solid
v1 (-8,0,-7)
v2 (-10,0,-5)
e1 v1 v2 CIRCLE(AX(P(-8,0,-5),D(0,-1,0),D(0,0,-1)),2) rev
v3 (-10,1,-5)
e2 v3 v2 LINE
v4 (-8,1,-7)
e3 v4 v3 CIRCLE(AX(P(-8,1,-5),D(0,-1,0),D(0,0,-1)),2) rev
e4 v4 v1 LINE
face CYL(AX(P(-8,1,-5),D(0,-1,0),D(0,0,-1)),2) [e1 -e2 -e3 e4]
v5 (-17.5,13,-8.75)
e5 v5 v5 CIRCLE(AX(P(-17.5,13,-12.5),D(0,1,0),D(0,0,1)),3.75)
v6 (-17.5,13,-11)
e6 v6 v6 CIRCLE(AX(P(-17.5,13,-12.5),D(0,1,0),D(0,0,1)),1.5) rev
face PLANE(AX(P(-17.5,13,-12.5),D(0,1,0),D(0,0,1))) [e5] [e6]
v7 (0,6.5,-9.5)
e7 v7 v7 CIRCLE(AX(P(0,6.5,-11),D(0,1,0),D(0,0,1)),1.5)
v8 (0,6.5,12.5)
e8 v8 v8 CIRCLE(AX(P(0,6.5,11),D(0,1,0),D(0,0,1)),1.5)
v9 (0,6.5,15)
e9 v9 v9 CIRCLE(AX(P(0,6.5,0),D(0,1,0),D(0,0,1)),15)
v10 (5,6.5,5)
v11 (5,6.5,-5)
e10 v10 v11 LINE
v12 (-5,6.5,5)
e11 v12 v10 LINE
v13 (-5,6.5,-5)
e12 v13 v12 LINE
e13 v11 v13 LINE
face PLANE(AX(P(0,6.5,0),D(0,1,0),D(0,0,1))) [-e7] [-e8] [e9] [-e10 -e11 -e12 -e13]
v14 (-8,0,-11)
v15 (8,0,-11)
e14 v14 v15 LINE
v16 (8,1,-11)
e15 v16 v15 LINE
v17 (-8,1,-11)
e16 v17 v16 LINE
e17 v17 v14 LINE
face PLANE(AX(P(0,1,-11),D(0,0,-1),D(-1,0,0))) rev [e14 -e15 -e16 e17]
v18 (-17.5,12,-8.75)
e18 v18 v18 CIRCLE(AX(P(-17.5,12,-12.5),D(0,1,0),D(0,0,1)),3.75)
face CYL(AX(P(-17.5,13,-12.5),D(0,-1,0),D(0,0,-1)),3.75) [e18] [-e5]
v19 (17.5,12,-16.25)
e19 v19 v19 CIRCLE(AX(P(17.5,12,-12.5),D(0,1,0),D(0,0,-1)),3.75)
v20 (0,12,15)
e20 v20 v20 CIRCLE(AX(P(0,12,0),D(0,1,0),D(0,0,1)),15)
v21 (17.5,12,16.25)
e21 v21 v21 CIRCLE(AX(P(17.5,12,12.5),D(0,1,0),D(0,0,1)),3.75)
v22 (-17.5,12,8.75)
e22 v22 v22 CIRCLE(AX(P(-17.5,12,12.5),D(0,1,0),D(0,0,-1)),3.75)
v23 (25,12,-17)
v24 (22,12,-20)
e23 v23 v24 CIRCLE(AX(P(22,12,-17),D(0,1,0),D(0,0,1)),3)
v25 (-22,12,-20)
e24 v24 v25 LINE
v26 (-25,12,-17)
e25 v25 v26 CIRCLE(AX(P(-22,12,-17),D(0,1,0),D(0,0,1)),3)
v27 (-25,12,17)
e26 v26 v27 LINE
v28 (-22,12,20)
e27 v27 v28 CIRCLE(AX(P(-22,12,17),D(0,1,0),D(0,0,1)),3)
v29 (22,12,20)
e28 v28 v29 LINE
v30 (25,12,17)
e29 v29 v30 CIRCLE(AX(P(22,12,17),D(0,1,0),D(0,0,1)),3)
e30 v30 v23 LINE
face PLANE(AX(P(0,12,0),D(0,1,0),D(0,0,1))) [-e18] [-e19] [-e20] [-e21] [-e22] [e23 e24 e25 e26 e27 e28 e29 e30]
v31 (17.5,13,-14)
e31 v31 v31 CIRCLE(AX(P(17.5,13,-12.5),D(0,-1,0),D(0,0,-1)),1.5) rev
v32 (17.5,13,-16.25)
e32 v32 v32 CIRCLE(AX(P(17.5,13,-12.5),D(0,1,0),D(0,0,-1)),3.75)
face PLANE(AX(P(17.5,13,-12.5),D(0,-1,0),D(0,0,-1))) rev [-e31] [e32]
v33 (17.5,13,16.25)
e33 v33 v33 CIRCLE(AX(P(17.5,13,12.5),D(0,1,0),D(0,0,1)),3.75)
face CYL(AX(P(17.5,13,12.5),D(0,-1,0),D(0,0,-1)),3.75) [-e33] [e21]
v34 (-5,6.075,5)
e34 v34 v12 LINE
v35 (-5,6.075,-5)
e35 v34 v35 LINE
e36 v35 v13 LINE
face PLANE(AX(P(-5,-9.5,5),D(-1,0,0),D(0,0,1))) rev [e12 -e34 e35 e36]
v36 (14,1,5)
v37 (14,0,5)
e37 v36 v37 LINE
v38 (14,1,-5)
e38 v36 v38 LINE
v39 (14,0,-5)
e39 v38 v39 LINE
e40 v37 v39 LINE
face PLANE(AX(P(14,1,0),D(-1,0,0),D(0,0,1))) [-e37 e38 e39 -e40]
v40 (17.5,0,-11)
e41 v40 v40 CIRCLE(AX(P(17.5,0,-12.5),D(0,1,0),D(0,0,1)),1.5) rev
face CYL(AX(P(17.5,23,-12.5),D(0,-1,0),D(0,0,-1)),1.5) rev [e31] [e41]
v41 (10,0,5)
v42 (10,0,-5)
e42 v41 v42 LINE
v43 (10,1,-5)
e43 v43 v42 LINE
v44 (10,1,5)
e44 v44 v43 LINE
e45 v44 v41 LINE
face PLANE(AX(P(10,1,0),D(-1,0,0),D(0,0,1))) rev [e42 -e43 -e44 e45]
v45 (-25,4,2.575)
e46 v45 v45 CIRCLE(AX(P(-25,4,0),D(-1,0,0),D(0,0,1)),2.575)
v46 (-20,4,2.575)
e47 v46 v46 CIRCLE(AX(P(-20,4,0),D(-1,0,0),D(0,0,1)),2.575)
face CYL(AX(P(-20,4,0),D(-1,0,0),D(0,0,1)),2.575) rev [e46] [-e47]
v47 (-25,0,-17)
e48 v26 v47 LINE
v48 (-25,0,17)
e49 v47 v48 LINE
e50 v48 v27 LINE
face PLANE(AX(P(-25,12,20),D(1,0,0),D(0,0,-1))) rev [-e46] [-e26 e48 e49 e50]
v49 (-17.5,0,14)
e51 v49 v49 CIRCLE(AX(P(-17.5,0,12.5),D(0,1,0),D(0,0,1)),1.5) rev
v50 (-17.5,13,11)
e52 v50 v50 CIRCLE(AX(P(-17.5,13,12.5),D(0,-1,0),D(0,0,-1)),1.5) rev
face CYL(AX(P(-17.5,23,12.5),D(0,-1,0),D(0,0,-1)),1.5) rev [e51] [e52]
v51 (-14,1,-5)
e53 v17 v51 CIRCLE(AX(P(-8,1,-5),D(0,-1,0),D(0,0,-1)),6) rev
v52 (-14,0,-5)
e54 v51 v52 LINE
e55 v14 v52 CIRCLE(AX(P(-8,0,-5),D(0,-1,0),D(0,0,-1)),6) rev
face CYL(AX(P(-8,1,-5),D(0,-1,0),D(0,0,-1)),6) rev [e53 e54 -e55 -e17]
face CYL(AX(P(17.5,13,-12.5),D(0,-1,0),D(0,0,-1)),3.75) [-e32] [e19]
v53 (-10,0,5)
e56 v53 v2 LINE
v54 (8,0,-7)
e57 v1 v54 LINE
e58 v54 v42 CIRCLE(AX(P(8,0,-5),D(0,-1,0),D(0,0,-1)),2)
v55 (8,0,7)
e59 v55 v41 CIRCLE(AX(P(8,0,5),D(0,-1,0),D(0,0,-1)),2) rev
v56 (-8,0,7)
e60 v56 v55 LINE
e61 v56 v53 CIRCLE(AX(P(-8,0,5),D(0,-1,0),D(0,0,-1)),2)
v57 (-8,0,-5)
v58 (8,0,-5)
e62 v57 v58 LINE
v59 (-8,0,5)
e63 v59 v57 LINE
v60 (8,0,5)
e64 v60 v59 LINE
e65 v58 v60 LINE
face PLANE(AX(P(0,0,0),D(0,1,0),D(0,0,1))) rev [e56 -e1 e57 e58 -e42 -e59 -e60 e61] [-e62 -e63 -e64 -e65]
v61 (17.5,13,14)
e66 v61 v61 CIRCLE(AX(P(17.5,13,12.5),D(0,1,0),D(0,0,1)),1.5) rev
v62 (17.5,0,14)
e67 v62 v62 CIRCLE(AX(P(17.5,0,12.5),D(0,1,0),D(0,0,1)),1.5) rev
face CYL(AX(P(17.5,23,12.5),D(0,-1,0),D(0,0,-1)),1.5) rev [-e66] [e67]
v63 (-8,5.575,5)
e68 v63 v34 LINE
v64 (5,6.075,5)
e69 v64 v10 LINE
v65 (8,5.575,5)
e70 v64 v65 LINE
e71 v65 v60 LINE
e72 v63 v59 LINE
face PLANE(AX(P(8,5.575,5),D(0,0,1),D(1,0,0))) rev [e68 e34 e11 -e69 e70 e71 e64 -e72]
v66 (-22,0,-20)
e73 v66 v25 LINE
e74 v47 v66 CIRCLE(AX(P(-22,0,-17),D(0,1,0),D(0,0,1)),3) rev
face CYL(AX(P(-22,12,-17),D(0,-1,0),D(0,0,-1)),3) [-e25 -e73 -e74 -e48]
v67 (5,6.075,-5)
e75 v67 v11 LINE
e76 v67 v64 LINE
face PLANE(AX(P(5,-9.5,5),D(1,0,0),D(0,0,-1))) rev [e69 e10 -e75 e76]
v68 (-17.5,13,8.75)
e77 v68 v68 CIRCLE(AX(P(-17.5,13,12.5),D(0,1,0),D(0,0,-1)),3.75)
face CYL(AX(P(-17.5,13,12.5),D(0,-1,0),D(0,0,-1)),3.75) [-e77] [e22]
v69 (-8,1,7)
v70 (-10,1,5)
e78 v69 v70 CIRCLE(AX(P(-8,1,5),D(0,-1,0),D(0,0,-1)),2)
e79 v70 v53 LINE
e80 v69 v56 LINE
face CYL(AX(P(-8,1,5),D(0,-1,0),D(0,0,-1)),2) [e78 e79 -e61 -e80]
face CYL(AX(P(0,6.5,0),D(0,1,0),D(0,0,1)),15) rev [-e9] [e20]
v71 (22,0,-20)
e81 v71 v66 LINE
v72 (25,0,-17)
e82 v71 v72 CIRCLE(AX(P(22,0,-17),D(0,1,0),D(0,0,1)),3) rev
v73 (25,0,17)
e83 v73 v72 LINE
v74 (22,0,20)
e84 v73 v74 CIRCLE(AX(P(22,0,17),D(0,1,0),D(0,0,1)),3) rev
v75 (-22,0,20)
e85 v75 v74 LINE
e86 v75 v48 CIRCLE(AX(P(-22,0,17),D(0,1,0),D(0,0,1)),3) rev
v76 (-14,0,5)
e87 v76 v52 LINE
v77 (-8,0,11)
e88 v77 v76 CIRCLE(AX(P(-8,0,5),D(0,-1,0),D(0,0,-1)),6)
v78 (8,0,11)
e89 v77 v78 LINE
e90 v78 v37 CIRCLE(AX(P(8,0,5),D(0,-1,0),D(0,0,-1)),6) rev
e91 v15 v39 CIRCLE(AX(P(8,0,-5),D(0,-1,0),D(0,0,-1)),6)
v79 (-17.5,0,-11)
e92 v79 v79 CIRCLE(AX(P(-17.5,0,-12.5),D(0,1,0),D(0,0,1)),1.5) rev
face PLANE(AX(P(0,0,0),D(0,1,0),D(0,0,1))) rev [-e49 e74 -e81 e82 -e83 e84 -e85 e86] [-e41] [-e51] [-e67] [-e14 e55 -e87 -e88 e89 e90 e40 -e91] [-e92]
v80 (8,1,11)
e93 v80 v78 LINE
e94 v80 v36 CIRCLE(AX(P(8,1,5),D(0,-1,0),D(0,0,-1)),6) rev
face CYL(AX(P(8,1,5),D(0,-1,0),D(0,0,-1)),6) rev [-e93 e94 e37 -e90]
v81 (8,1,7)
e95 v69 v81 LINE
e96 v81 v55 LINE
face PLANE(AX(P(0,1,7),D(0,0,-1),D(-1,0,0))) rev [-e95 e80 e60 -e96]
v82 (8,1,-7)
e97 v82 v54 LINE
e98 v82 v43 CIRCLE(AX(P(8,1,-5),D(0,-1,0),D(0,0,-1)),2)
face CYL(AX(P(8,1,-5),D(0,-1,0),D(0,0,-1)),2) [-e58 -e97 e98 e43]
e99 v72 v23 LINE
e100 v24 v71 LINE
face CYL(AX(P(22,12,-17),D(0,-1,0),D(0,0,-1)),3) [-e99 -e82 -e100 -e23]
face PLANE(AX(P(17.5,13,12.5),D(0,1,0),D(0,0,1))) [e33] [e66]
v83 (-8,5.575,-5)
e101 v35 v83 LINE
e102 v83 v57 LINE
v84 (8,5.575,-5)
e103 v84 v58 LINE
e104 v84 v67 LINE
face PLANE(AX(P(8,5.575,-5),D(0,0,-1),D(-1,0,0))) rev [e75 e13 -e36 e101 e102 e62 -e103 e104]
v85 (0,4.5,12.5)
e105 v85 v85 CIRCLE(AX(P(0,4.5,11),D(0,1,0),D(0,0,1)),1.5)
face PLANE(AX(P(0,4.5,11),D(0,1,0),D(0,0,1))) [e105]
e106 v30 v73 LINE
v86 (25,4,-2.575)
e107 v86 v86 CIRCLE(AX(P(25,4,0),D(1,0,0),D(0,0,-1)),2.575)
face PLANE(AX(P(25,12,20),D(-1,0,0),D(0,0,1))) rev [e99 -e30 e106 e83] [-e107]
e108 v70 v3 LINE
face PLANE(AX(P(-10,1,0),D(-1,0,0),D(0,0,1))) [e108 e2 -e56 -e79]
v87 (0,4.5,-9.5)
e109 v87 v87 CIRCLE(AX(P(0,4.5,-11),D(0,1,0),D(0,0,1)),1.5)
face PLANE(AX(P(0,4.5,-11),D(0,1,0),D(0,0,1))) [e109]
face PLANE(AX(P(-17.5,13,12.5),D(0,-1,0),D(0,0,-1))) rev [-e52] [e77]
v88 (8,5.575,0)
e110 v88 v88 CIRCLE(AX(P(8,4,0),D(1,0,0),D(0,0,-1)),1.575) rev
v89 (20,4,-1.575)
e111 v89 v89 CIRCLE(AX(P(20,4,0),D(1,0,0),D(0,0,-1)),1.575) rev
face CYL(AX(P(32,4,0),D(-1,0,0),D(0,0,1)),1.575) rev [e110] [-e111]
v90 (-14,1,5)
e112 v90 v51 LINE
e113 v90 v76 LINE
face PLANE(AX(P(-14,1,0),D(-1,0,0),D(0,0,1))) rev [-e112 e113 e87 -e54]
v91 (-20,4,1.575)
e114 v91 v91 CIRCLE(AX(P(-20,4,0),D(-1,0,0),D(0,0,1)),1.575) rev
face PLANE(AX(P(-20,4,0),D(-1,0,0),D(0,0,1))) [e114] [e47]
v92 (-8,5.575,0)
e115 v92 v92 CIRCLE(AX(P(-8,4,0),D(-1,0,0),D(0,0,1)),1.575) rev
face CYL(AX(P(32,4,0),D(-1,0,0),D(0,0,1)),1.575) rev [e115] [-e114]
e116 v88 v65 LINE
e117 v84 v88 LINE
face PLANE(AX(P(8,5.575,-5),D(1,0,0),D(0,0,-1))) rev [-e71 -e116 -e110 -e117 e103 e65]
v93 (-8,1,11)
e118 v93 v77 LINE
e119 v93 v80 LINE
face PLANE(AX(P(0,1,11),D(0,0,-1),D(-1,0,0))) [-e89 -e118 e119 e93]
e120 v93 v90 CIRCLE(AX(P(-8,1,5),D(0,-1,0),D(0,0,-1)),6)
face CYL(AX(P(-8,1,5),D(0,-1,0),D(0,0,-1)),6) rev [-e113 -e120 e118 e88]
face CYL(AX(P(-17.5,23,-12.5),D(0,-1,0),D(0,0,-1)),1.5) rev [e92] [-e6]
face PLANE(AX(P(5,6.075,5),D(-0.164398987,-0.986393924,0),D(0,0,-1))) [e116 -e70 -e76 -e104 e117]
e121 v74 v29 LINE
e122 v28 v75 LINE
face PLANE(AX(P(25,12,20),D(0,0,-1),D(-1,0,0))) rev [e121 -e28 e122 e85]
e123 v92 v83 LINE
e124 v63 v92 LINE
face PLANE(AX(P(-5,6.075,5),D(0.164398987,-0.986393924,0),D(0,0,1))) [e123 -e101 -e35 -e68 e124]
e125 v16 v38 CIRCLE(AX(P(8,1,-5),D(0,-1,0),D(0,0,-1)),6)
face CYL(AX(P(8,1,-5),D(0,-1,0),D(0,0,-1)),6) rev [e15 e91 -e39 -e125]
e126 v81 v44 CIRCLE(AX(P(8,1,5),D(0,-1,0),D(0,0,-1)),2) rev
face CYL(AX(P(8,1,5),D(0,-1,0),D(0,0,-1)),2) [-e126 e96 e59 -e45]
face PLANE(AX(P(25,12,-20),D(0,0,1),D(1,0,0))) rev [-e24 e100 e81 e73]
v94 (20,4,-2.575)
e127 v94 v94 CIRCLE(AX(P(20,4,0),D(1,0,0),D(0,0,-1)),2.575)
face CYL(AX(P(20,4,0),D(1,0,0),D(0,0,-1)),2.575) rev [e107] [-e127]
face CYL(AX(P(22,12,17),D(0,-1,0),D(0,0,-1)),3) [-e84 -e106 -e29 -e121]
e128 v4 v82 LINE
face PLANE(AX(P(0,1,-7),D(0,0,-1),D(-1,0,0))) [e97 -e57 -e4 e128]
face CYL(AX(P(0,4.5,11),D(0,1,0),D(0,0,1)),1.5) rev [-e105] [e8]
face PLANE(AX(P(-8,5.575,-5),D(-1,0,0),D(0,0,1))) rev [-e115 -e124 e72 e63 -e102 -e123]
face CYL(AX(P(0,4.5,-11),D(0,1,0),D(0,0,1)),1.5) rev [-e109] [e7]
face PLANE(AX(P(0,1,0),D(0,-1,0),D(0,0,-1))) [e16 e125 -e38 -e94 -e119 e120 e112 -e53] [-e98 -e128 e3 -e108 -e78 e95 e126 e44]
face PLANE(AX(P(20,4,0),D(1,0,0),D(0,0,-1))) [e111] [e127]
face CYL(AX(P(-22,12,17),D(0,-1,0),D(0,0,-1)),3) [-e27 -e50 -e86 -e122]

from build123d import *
from OCP.BRepFilletAPI import BRepFilletAPI_MakeChamfer

# Parameters (mm, degrees)
SKETCH1_W           = 50
SKETCH1_H           = 40
BODY_DEPTH          = 12
FILLETBODY_R        = 3
SKETCH3_R           = 3.75
BOLT_EXTRUDE_DEPTH  = 1
BOLT_DEPTH          = 10
BOLT_DEPTH_BACK     = 16
SKETCH4_R           = 1.5
SKETCH41_R          = 1.575
CHANNEL1_DEPTH      = 57
SKETCH42_R          = 2.575
INLET_DEPTH         = 5
OUTLET_START        = -5
SKETCH43_R          = 2.575
OUTLET_DEPTH        = 5
SKETCH44_R          = 15
WINDOW_DEPTH        = 5.5
SKETCH45_W          = 16
SKETCH45_H          = 10
FLOWCH_DEPTH        = 5.575
SKETCH46_W          = 10
SKETCH46_H          = 10
WINDOW_HOLE_DEPTH   = 16
SKETCH49_R          = 1.5
FIXHOLES_DEPTH      = 2
GASKET_DEPTH        = 1
CHAMFER_FLOW_SIZE   = 0.5
CHAMFER_FLOW_SIZE_2 = 3


with BuildPart() as part:
    # Sketch1 → Body (new body)
    with BuildSketch(Plane(origin=(0, 0, 0), x_dir=(1, 0, 0), z_dir=(0, 1, 0))):
        Rectangle(SKETCH1_W, SKETCH1_H)
    extrude(amount=BODY_DEPTH)

    # FilletBody
    filletbody_edges = [part.edges().sort_by_distance(p)[0] for p in [
        (-25, 6, -20),
        (25, 6, -20),
        (25, 6, 20),
        (-25, 6, 20),
    ]]
    fillet(filletbody_edges, radius=FILLETBODY_R)

    # Sketch3 → Bolt extrude (add)
    with BuildSketch(Plane(origin=(0, 12, 0), x_dir=(1, 0, 0), z_dir=(0, 1, 0))):
        with Locations(Location((-17.5, 12.5, 0), (0, 0, 270))):
            Circle(SKETCH3_R)
        with Locations(Location((17.5, 12.5, 0), (0, 0, 90))):
            Circle(SKETCH3_R)
        with Locations(Location((17.5, -12.5, 0), (0, 0, 270))):
            Circle(SKETCH3_R)
        with Locations(Location((-17.5, -12.5, 0), (0, 0, 90))):
            Circle(SKETCH3_R)
    extrude(amount=BOLT_EXTRUDE_DEPTH)

    # Sketch4 → Bolt (cut, two sides: drawn at the far end of the back side and taken through both)
    with BuildSketch(Plane(origin=(0, 13, 0), x_dir=(1, 0, 0), z_dir=(0, 1, 0)).offset(-BOLT_DEPTH_BACK)):
        with Locations(Location((-17.5, 12.5, 0), (0, 0, 270))):
            Circle(SKETCH4_R)
        with Locations(Location((17.5, 12.5, 0), (0, 0, 90))):
            Circle(SKETCH4_R)
        with Locations(Location((17.5, -12.5, 0), (0, 0, 270))):
            Circle(SKETCH4_R)
        with Locations(Location((-17.5, -12.5, 0), (0, 0, 90))):
            Circle(SKETCH4_R)
    extrude(amount=BOLT_DEPTH + BOLT_DEPTH_BACK, mode=Mode.SUBTRACT)

    # Sketch41 → Channel1 (cut)
    with BuildSketch(Plane.ZY.offset(25)):
        with Locations((0, 4)):
            Circle(SKETCH41_R)
    extrude(amount=-CHANNEL1_DEPTH, mode=Mode.SUBTRACT)

    # Sketch42 → Inlet (cut)
    with BuildSketch(Plane.ZY.offset(25)):
        with Locations((0, 4)):
            Circle(SKETCH42_R)
    extrude(amount=-INLET_DEPTH, mode=Mode.SUBTRACT)

    # Sketch43 → Outlet (cut)
    with BuildSketch(Plane(origin=(25, 0, 0), x_dir=(0, 0, -1), z_dir=(1, 0, 0)).offset(OUTLET_START)):
        with Locations(Location((0, 4, 0), (0, 0, 180))):
            Circle(SKETCH43_R)
    extrude(amount=OUTLET_DEPTH, mode=Mode.SUBTRACT)

    # Sketch44 → Window (cut)
    with BuildSketch(Plane(origin=(0, 12, 0), x_dir=(1, 0, 0), z_dir=(0, 1, 0))):
        with Locations(Location((0, 0, 0), (0, 0, 270))):
            Circle(SKETCH44_R)
    extrude(amount=-WINDOW_DEPTH, mode=Mode.SUBTRACT)

    # Sketch45 → FlowCh (cut)
    with BuildSketch(Plane.XZ):
        Rectangle(SKETCH45_W, SKETCH45_H)
    extrude(amount=-FLOWCH_DEPTH, mode=Mode.SUBTRACT)

    # Sketch46 → Window_hole (cut)
    with BuildSketch(Plane(origin=(0, 6.5, 0), x_dir=(1, 0, 0), z_dir=(0, 1, 0))):
        Rectangle(SKETCH46_W, SKETCH46_H)
    extrude(amount=-WINDOW_HOLE_DEPTH, mode=Mode.SUBTRACT)

    # Sketch49 → FixHoles (cut)
    with BuildSketch(Plane(origin=(0, 6.5, 0), x_dir=(1, 0, 0), z_dir=(0, 1, 0))):
        with Locations(Location((0, 11, 0), (0, 0, 270))):
            Circle(SKETCH49_R)
        with Locations(Location((0, -11, 0), (0, 0, 270))):
            Circle(SKETCH49_R)
    extrude(amount=-FIXHOLES_DEPTH, mode=Mode.SUBTRACT)

    # Sketch50 → Gasket (cut)
    with BuildSketch(Plane.XZ):
        with BuildLine():
            ThreePointArc((8, 11), (12.242640687, 9.242640687), (14, 5))
            Line((14, 5), (14, -5))
            ThreePointArc((14, -5), (12.242640687, -9.242640687), (8, -11))
            Line((8, -11), (-8, -11))
            ThreePointArc((-8, -11), (-12.242640687, -9.242640687), (-14, -5))
            Line((-14, -5), (-14, 5))
            ThreePointArc((-14, 5), (-12.242640687, 9.242640687), (-8, 11))
            Line((-8, 11), (8, 11))
        make_face()
        with BuildLine():
            Line((-8, -7), (8, -7))
            ThreePointArc((8, -7), (9.414213562, -6.414213562), (10, -5))
            Line((10, -5), (10, 5))
            ThreePointArc((10, 5), (9.414213562, 6.414213562), (8, 7))
            Line((8, 7), (-8, 7))
            ThreePointArc((-8, 7), (-9.414213562, 6.414213562), (-10, 5))
            Line((-10, 5), (-10, -5))
            ThreePointArc((-10, -5), (-9.414213562, -6.414213562), (-8, -7))
        make_face(mode=Mode.SUBTRACT)
    extrude(amount=-GASKET_DEPTH, mode=Mode.SUBTRACT)

    # Chamfer_flow
    chamfer_flow_edges_1 = [part.edges().sort_by_distance(p)[0] for p in [
        (5, 5.575, 0),
    ]]
    chamfer_flow_side_1 = [part.faces().sort_by_distance(p)[0] for p in [
        (5, 5.585, 0),
    ]]
    chamfer_flow_edges_2 = [part.edges().sort_by_distance(p)[0] for p in [
        (-5, 5.575, 0),
    ]]
    chamfer_flow_side_2 = [part.faces().sort_by_distance(p)[0] for p in [
        (-5, 5.585, 0),
    ]]
    chamfer_flow = BRepFilletAPI_MakeChamfer(part.part.solid().wrapped)
    for e in chamfer_flow_edges_1:
        chamfer_flow.Add(CHAMFER_FLOW_SIZE - 0.0001, CHAMFER_FLOW_SIZE_2 - 0.0001, e.wrapped, chamfer_flow_side_1[0].wrapped)
    for e in chamfer_flow_edges_2:
        chamfer_flow.Add(CHAMFER_FLOW_SIZE - 0.0001, CHAMFER_FLOW_SIZE_2 - 0.0001, e.wrapped, chamfer_flow_side_2[0].wrapped)
    add(Compound.cast(chamfer_flow.Shape()), mode=Mode.REPLACE)  # a hair under: the kernel refuses the full size


solid = part.part
